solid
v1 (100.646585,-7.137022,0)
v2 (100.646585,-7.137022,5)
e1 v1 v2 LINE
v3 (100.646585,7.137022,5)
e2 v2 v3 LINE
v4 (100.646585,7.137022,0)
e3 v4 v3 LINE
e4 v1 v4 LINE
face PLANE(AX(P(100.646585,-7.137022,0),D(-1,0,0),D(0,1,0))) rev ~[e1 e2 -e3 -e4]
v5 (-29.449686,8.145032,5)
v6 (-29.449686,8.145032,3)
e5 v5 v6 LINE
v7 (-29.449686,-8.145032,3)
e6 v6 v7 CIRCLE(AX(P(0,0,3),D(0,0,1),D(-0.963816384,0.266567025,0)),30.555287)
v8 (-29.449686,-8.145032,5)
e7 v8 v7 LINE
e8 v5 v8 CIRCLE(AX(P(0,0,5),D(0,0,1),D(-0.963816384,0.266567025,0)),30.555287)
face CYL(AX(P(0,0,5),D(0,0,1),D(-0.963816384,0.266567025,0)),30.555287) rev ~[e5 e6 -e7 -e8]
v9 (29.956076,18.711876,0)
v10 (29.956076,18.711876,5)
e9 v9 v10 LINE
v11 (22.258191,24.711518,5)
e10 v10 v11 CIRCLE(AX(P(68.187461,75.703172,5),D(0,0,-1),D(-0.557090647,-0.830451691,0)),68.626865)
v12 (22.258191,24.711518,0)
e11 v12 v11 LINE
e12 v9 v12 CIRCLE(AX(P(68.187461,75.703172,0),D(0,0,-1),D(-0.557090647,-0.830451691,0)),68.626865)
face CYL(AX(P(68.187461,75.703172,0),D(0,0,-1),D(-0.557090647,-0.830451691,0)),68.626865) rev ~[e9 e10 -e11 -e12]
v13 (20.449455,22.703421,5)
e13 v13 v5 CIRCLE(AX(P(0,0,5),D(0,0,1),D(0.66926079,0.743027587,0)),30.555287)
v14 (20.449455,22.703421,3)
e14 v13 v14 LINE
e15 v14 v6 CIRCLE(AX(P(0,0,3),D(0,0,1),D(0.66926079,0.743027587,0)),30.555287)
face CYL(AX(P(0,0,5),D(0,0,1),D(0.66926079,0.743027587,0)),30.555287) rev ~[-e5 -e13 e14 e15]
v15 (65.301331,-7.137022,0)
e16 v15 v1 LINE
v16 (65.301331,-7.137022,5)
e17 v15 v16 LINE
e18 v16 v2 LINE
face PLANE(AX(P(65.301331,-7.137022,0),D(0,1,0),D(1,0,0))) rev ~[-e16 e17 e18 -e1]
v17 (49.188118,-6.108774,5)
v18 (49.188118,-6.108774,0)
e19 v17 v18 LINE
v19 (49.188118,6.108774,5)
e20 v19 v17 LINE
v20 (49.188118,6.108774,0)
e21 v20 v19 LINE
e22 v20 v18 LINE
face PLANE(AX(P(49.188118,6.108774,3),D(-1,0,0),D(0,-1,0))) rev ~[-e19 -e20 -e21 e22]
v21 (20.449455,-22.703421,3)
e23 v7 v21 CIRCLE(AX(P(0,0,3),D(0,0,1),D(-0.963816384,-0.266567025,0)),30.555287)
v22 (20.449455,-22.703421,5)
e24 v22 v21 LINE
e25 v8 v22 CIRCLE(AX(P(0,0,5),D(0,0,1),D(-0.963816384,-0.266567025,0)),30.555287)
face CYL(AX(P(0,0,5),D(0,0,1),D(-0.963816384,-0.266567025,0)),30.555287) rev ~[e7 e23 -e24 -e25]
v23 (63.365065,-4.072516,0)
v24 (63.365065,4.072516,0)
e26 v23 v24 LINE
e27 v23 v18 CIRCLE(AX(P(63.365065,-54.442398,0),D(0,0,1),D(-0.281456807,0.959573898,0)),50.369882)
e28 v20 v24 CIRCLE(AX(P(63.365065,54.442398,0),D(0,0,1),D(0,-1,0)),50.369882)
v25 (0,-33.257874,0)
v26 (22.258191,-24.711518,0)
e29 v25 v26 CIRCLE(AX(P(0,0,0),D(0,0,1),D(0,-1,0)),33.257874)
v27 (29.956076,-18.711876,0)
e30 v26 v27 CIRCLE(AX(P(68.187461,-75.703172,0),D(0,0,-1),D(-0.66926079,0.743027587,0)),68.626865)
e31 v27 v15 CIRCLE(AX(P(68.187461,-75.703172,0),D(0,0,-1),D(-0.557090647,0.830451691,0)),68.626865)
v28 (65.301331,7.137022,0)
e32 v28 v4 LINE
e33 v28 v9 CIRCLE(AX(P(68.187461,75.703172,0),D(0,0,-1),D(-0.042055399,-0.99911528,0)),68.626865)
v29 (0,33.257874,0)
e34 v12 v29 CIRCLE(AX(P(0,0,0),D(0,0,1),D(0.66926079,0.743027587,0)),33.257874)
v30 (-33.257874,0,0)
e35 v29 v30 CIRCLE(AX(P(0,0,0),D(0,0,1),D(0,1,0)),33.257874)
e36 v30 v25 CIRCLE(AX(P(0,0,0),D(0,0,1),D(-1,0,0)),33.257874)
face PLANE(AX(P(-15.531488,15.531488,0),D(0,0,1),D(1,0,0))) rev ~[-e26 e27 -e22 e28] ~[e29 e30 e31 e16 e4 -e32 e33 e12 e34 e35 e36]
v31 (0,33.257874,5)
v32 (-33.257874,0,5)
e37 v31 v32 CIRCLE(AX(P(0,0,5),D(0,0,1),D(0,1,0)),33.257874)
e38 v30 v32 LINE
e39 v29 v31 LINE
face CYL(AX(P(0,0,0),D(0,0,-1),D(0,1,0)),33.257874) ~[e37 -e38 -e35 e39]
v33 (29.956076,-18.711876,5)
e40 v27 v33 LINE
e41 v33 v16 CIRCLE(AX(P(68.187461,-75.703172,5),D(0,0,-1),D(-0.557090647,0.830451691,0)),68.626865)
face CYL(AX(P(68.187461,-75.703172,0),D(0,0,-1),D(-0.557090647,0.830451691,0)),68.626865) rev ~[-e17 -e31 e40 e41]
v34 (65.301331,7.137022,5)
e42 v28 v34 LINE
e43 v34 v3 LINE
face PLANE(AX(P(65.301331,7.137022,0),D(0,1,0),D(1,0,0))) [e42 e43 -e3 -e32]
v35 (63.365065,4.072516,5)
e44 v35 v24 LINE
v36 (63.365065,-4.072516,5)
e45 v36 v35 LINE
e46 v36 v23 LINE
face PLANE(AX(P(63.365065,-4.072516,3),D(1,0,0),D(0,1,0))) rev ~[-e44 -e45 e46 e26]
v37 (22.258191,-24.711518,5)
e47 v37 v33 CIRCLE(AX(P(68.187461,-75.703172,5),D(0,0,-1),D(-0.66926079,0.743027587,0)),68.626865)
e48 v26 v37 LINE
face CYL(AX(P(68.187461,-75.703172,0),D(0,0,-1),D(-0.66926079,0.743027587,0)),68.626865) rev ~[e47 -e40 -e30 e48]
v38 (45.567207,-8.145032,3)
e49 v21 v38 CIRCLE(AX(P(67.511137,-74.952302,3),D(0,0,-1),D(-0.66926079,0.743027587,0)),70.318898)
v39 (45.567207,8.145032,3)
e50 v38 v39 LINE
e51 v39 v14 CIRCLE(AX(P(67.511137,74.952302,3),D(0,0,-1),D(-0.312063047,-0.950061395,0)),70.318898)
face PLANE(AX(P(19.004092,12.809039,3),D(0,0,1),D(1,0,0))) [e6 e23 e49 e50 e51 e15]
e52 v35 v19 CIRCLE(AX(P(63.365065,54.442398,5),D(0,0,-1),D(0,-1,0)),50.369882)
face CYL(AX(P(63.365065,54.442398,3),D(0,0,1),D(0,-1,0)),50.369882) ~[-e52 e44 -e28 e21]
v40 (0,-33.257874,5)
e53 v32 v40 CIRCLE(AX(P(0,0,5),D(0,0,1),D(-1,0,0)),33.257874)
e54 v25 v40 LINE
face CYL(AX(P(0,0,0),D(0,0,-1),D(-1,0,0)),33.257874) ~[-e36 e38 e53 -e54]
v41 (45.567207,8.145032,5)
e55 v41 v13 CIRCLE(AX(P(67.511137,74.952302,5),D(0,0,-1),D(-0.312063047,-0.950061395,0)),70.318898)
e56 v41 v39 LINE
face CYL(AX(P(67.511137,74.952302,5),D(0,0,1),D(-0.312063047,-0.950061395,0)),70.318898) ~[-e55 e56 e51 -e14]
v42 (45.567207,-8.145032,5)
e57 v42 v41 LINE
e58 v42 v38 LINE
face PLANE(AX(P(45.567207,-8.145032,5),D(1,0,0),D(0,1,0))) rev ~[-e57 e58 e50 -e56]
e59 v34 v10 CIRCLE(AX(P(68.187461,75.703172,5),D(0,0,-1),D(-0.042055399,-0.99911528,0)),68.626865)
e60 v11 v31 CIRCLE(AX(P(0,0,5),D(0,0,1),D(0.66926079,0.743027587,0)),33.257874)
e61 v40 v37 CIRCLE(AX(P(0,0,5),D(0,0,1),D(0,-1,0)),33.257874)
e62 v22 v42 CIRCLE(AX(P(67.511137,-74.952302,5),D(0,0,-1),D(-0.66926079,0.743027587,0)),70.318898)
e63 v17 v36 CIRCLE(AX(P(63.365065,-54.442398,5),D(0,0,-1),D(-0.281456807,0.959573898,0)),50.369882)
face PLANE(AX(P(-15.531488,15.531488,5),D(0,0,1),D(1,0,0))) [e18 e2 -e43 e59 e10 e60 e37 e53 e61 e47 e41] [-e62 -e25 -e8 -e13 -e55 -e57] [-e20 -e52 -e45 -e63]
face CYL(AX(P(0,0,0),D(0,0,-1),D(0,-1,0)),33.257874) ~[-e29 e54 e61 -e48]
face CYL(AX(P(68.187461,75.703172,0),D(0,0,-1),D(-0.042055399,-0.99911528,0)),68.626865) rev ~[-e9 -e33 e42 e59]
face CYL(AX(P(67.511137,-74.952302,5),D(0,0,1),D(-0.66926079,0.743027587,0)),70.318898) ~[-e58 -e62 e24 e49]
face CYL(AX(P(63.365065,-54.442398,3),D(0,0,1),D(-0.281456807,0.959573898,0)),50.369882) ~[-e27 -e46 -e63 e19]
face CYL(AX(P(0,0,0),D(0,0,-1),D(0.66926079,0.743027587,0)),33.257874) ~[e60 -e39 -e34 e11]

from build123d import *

# Parameters (mm, degrees)
F0_W     = 29.9560762942
F0_H     = 7.1370224468
F0_W_2   = 35.3452544659
F1_DEPTH = 5
F2_W     = 3.7603338286
F2_H     = 4.0725159595
F2_W_2   = 14.1769461334
F3_DEPTH = 2
F4_DEPTH = 25


with BuildPart() as f1:
    # F0 (on Top) → F1 (new body)
    with BuildSketch(Plane.XY):
        with BuildLine():
            Line((0, 7.1370224468), (0, 33.2578741251))
            ThreePointArc((0, 33.2578741251), (-23.5168683217, 23.5168683217), (-33.2578741251, 0))
            Line((-33.2578741251, 0), (-29.9560762942, 0))
            Line((-29.9560762942, 0), (-29.9560762942, 7.1370224468))
            Line((-29.9560762942, 7.1370224468), (0, 7.1370224468))
        make_face()
        with BuildLine():
            Line((-29.9560762942, 0), (-33.2578741251, 0))
            ThreePointArc((-33.2578741251, 0), (-23.5168683217, -23.5168683217), (0, -33.2578741251))
            Line((0, -33.2578741251), (0, -7.1370224468))
            Line((0, -7.1370224468), (-29.9560762942, -7.1370224468))
            Line((-29.9560762942, -7.1370224468), (-29.9560762942, 0))
        make_face()
        with Locations((-14.9780381471, -3.5685112234)):
            Rectangle(F0_W, F0_H)
        with Locations((-14.9780381471, 3.5685112234)):
            Rectangle(F0_W, F0_H)
        with BuildLine():
            Line((0, -7.1370224468), (0, -33.2578741251))
            ThreePointArc((0, -33.2578741251), (11.9212758791, -31.0478561697), (22.2581910956, -24.7115179719))
            Line((22.2581910956, -24.7115179719), (6.4284682817, -7.1370224468))
            Line((6.4284682817, -7.1370224468), (0, -7.1370224468))
        make_face()
        with BuildLine():
            Line((29.9560762942, -7.1370224468), (6.4284682817, -7.1370224468))
            Line((6.4284682817, -7.1370224468), (22.2581910956, -24.7115179719))
            ThreePointArc((22.2581910956, -24.7115179719), (26.6068003283, -19.95405642), (29.9560762942, -14.4471341234))
            Line((29.9560762942, -14.4471341234), (29.9560762942, -7.1370224468))
        make_face()
        Polygon((6.4284682817, -7.1370224468), (0, 0), (0, -7.1370224468), align=None)
        Polygon((29.9560762942, 0), (0, 0), (6.4284682817, -7.1370224468), (29.9560762942, -7.1370224468), align=None)
        Polygon((29.9560762942, 7.1370224468), (6.4284682817, 7.1370224468), (0, 0), (29.9560762942, 0), align=None)
        Polygon((0, 0), (6.4284682817, 7.1370224468), (0, 7.1370224468), align=None)
        with BuildLine():
            ThreePointArc((29.9560762942, 14.4471341234), (26.6068003283, 19.95405642), (22.2581910956, 24.7115179719))
            Line((22.2581910956, 24.7115179719), (6.4284682817, 7.1370224468))
            Line((6.4284682817, 7.1370224468), (29.9560762942, 7.1370224468))
            Line((29.9560762942, 7.1370224468), (29.9560762942, 14.4471341234))
        make_face()
        with BuildLine():
            Line((6.4284682817, 7.1370224468), (22.2581910956, 24.7115179719))
            ThreePointArc((22.2581910956, 24.7115179719), (11.9212758791, 31.0478561697), (0, 33.2578741251))
            Line((0, 33.2578741251), (0, 7.1370224468))
            Line((0, 7.1370224468), (6.4284682817, 7.1370224468))
        make_face()
        with BuildLine():
            ThreePointArc((29.9560762942, 18.7118758373), (26.0003436233, 21.5746791136), (22.2581910956, 24.7115179719))
            ThreePointArc((22.2581910956, 24.7115179719), (26.6068003283, 19.95405642), (29.9560762942, 14.4471341234))
            Line((29.9560762942, 14.4471341234), (29.9560762942, 18.7118758373))
        make_face()
        with BuildLine():
            ThreePointArc((29.9560762942, -14.4471341234), (26.6068003283, -19.95405642), (22.2581910956, -24.7115179719))
            ThreePointArc((22.2581910956, -24.7115179719), (26.0003436233, -21.5746791136), (29.9560762942, -18.7118758373))
            Line((29.9560762942, -18.7118758373), (29.9560762942, -14.4471341234))
        make_face()
        with BuildLine():
            ThreePointArc((29.9560762942, -14.4471341234), (31.4327985964, -10.8657886838), (32.4830586909, -7.1370224468))
            Line((32.4830586909, -7.1370224468), (29.9560762942, -7.1370224468))
            Line((29.9560762942, -7.1370224468), (29.9560762942, -14.4471341234))
        make_face()
        with BuildLine():
            ThreePointArc((32.4830586909, -7.1370224468), (33.0636028622, -3.5894786656), (33.2578741251, 0))
            Line((33.2578741251, 0), (29.9560762942, 0))
            Line((29.9560762942, 0), (29.9560762942, -7.1370224468))
            Line((29.9560762942, -7.1370224468), (32.4830586909, -7.1370224468))
        make_face()
        with BuildLine():
            ThreePointArc((33.2578741251, 0), (33.0636028622, 3.5894786656), (32.4830586909, 7.1370224468))
            Line((32.4830586909, 7.1370224468), (29.9560762942, 7.1370224468))
            Line((29.9560762942, 7.1370224468), (29.9560762942, 0))
            Line((29.9560762942, 0), (33.2578741251, 0))
        make_face()
        with BuildLine():
            ThreePointArc((32.4830586909, 7.1370224468), (31.4327985964, 10.8657886838), (29.9560762942, 14.4471341234))
            Line((29.9560762942, 14.4471341234), (29.9560762942, 7.1370224468))
            Line((29.9560762942, 7.1370224468), (32.4830586909, 7.1370224468))
        make_face()
        with BuildLine():
            Line((29.9560762942, 18.7118758373), (29.9560762942, 14.4471341234))
            ThreePointArc((29.9560762942, 14.4471341234), (31.4327985964, 10.8657886838), (32.4830586909, 7.1370224468))
            Line((32.4830586909, 7.1370224468), (65.3013307601, 7.1370224468))
            ThreePointArc((65.3013307601, 7.1370224468), (46.829633004, 10.4843879142), (29.9560762942, 18.7118758373))
        make_face()
        with BuildLine():
            Line((65.3013307601, 7.1370224468), (32.4830586909, 7.1370224468))
            ThreePointArc((32.4830586909, 7.1370224468), (33.0636028622, 3.5894786656), (33.2578741251, 0))
            Line((33.2578741251, 0), (65.3013307601, 0))
            Line((65.3013307601, 0), (65.3013307601, 7.1370224468))
        make_face()
        with BuildLine():
            Line((65.3013307601, 0), (33.2578741251, 0))
            ThreePointArc((33.2578741251, 0), (33.0636028622, -3.5894786656), (32.4830586909, -7.1370224468))
            Line((32.4830586909, -7.1370224468), (65.3013307601, -7.1370224468))
            Line((65.3013307601, -7.1370224468), (65.3013307601, 0))
        make_face()
        with BuildLine():
            Line((65.3013307601, -7.1370224468), (32.4830586909, -7.1370224468))
            ThreePointArc((32.4830586909, -7.1370224468), (31.4327985964, -10.8657886838), (29.9560762942, -14.4471341234))
            Line((29.9560762942, -14.4471341234), (29.9560762942, -18.7118758373))
            ThreePointArc((29.9560762942, -18.7118758373), (46.829633004, -10.4843879142), (65.3013307601, -7.1370224468))
        make_face()
        with Locations((82.9739579931, -3.5685112234)):
            Rectangle(F0_W_2, F0_H)
        with Locations((82.9739579931, 3.5685112234)):
            Rectangle(F0_W_2, F0_H)
    extrude(amount=F1_DEPTH)

    # F2 (on face) → F3 (cut)
    with BuildSketch(Plane.XY.offset(5)):
        with BuildLine():
            Line((7.3364039044, 8.145031919), (29.4496861323, 8.145031919))
            ThreePointArc((29.4496861323, 8.145031919), (25.9897625324, 16.0672898076), (20.4494554433, 22.703421115))
            Line((20.4494554433, 22.703421115), (7.3364039044, 8.145031919))
        make_face()
        with BuildLine():
            Line((45.5672070233, 8.145031919), (29.4496861323, 8.145031919))
            ThreePointArc((29.4496861323, 8.145031919), (29.9355135784, 6.1229555814), (30.2826711505, 4.0725159595))
            Line((30.2826711505, 4.0725159595), (45.5672070233, 4.0725159595))
            Line((45.5672070233, 4.0725159595), (45.5672070233, 5.9387854649))
            Line((45.5672070233, 5.9387854649), (45.5672070233, 8.145031919))
        make_face()
        Polygon((29.4496861323, 4.0725159595), (29.4496861323, 8.145031919), (7.3364039044, 8.145031919), (3.6682019522, 4.0725159595), (25.6893523037, 4.0725159595), align=None)
        with BuildLine():
            ThreePointArc((30.2826711505, 4.0725159595), (29.9355135784, 6.1229555814), (29.4496861323, 8.145031919))
            Line((29.4496861323, 8.145031919), (29.4496861323, 4.0725159595))
            Line((29.4496861323, 4.0725159595), (30.2826711505, 4.0725159595))
        make_face()
        with BuildLine():
            ThreePointArc((20.4494554433, 22.703421115), (25.9897625324, 16.0672898076), (29.4496861323, 8.145031919))
            Line((29.4496861323, 8.145031919), (45.5672070233, 8.145031919))
            ThreePointArc((45.5672070233, 8.145031919), (32.2488302064, 14.1138509074), (20.4494554433, 22.703421115))
        make_face()
        with BuildLine():
            Line((7.3364039044, 8.145031919), (20.4494554433, 22.703421115))
            ThreePointArc((20.4494554433, 22.703421115), (-8.557903488, 29.3323685737), (-29.4496861323, 8.145031919))
            Line((-29.4496861323, 8.145031919), (7.3364039044, 8.145031919))
        make_face()
        with BuildLine():
            Line((45.5672070233, 4.0725159595), (30.2826711505, 4.0725159595))
            ThreePointArc((30.2826711505, 4.0725159595), (30.4870567923, 2.0408151309), (30.5552869116, 0))
            Line((30.5552869116, 0), (45.5672070233, 0))
            Line((45.5672070233, 0), (45.5672070233, 4.0725159595))
        make_face()
        with BuildLine():
            ThreePointArc((30.5552869116, 0), (30.4870567923, 2.0408151309), (30.2826711505, 4.0725159595))
            Line((30.2826711505, 4.0725159595), (29.4496861323, 4.0725159595))
            Line((29.4496861323, 4.0725159595), (29.4496861323, 0))
            Line((29.4496861323, 0), (30.5552869116, 0))
        make_face()
        Polygon((3.6682019522, 4.0725159595), (7.3364039044, 8.145031919), (-29.4496861323, 8.145031919), (-29.4496861323, -8.145031919), (7.3364039044, -8.145031919), (3.6682019522, -4.0725159595), (-25.6893523037, -4.0725159595), (-25.6893523037, 4.0725159595), align=None)
        with Locations((27.569519218, 2.0362579798)):
            Rectangle(F2_W, F2_H)
        with BuildLine():
            Line((-29.4496861323, -8.145031919), (-29.4496861323, 8.145031919))
            ThreePointArc((-29.4496861323, 8.145031919), (-30.5552869116, 0), (-29.4496861323, -8.145031919))
        make_face()
        with BuildLine():
            Line((45.5672070233, 0), (30.5552869116, 0))
            ThreePointArc((30.5552869116, 0), (30.4870567923, -2.0408151309), (30.2826711505, -4.0725159595))
            Line((30.2826711505, -4.0725159595), (45.5672070233, -4.0725159595))
            Line((45.5672070233, -4.0725159595), (45.5672070233, 0))
        make_face()
        with BuildLine():
            ThreePointArc((30.2826711505, -4.0725159595), (30.4870567923, -2.0408151309), (30.5552869116, 0))
            Line((30.5552869116, 0), (29.4496861323, 0))
            Line((29.4496861323, 0), (29.4496861323, -4.0725159595))
            Line((29.4496861323, -4.0725159595), (30.2826711505, -4.0725159595))
        make_face()
        Polygon((25.6893523037, 4.0725159595), (3.6682019522, 4.0725159595), (0, 0), (25.6893523037, 0), align=None)
        Polygon((0, 0), (3.6682019522, 4.0725159595), (-25.6893523037, 4.0725159595), (-25.6893523037, -4.0725159595), (3.6682019522, -4.0725159595), align=None)
        with Locations((27.569519218, -2.0362579798)):
            Rectangle(F2_W, F2_H)
        with BuildLine():
            Line((7.3364039044, -8.145031919), (-29.4496861323, -8.145031919))
            ThreePointArc((-29.4496861323, -8.145031919), (-8.557903488, -29.3323685737), (20.4494554433, -22.703421115))
            Line((20.4494554433, -22.703421115), (7.3364039044, -8.145031919))
        make_face()
        with BuildLine():
            Line((45.5672070233, -4.0725159595), (30.2826711505, -4.0725159595))
            ThreePointArc((30.2826711505, -4.0725159595), (29.9355135784, -6.1229555814), (29.4496861323, -8.145031919))
            Line((29.4496861323, -8.145031919), (45.5672070233, -8.145031919))
            Line((45.5672070233, -8.145031919), (45.5672070233, -5.9387854649))
            Line((45.5672070233, -5.9387854649), (45.5672070233, -4.0725159595))
        make_face()
        with BuildLine():
            ThreePointArc((29.4496861323, -8.145031919), (29.9355135784, -6.1229555814), (30.2826711505, -4.0725159595))
            Line((30.2826711505, -4.0725159595), (29.4496861323, -4.0725159595))
            Line((29.4496861323, -4.0725159595), (29.4496861323, -8.145031919))
        make_face()
        with BuildLine():
            Line((49.188118428, 6.1087739393), (49.188118428, 4.0725159595))
            Line((49.188118428, 4.0725159595), (63.3650645614, 4.0725159595))
            ThreePointArc((63.3650645614, 4.0725159595), (56.2038469933, 4.5841792227), (49.188118428, 6.1087739393))
        make_face()
        with Locations((56.2765914947, 2.0362579798)):
            Rectangle(F2_W_2, F2_H)
        Polygon((25.6893523037, 0), (0, 0), (3.6682019522, -4.0725159595), (25.6893523037, -4.0725159595), align=None)
        Polygon((29.4496861323, -8.145031919), (29.4496861323, -4.0725159595), (25.6893523037, -4.0725159595), (3.6682019522, -4.0725159595), (7.3364039044, -8.145031919), align=None)
        with BuildLine():
            Line((7.3364039044, -8.145031919), (20.4494554433, -22.703421115))
            ThreePointArc((20.4494554433, -22.703421115), (25.9897625324, -16.0672898076), (29.4496861323, -8.145031919))
            Line((29.4496861323, -8.145031919), (7.3364039044, -8.145031919))
        make_face()
        with BuildLine():
            ThreePointArc((29.4496861323, -8.145031919), (25.9897625324, -16.0672898076), (20.4494554433, -22.703421115))
            ThreePointArc((20.4494554433, -22.703421115), (32.2488302064, -14.1138509074), (45.5672070233, -8.145031919))
            Line((45.5672070233, -8.145031919), (29.4496861323, -8.145031919))
        make_face()
        with Locations((56.2765914947, -2.0362579798)):
            Rectangle(F2_W_2, F2_H)
        with BuildLine():
            Line((63.3650645614, -4.0725159595), (49.188118428, -4.0725159595))
            Line((49.188118428, -4.0725159595), (49.188118428, -6.1087739393))
            ThreePointArc((49.188118428, -6.1087739393), (56.2038469933, -4.5841792227), (63.3650645614, -4.0725159595))
        make_face()
    extrude(amount=-F3_DEPTH, mode=Mode.SUBTRACT)

    # F4 (cut): a face of the model
    f4_faces = [f1.faces().sort_by_distance(p)[0] for p in [
        (55.7717921827, 0, 3),
    ]]
    extrude(f4_faces, amount=-F4_DEPTH, mode=Mode.SUBTRACT)


solid = f1.part
